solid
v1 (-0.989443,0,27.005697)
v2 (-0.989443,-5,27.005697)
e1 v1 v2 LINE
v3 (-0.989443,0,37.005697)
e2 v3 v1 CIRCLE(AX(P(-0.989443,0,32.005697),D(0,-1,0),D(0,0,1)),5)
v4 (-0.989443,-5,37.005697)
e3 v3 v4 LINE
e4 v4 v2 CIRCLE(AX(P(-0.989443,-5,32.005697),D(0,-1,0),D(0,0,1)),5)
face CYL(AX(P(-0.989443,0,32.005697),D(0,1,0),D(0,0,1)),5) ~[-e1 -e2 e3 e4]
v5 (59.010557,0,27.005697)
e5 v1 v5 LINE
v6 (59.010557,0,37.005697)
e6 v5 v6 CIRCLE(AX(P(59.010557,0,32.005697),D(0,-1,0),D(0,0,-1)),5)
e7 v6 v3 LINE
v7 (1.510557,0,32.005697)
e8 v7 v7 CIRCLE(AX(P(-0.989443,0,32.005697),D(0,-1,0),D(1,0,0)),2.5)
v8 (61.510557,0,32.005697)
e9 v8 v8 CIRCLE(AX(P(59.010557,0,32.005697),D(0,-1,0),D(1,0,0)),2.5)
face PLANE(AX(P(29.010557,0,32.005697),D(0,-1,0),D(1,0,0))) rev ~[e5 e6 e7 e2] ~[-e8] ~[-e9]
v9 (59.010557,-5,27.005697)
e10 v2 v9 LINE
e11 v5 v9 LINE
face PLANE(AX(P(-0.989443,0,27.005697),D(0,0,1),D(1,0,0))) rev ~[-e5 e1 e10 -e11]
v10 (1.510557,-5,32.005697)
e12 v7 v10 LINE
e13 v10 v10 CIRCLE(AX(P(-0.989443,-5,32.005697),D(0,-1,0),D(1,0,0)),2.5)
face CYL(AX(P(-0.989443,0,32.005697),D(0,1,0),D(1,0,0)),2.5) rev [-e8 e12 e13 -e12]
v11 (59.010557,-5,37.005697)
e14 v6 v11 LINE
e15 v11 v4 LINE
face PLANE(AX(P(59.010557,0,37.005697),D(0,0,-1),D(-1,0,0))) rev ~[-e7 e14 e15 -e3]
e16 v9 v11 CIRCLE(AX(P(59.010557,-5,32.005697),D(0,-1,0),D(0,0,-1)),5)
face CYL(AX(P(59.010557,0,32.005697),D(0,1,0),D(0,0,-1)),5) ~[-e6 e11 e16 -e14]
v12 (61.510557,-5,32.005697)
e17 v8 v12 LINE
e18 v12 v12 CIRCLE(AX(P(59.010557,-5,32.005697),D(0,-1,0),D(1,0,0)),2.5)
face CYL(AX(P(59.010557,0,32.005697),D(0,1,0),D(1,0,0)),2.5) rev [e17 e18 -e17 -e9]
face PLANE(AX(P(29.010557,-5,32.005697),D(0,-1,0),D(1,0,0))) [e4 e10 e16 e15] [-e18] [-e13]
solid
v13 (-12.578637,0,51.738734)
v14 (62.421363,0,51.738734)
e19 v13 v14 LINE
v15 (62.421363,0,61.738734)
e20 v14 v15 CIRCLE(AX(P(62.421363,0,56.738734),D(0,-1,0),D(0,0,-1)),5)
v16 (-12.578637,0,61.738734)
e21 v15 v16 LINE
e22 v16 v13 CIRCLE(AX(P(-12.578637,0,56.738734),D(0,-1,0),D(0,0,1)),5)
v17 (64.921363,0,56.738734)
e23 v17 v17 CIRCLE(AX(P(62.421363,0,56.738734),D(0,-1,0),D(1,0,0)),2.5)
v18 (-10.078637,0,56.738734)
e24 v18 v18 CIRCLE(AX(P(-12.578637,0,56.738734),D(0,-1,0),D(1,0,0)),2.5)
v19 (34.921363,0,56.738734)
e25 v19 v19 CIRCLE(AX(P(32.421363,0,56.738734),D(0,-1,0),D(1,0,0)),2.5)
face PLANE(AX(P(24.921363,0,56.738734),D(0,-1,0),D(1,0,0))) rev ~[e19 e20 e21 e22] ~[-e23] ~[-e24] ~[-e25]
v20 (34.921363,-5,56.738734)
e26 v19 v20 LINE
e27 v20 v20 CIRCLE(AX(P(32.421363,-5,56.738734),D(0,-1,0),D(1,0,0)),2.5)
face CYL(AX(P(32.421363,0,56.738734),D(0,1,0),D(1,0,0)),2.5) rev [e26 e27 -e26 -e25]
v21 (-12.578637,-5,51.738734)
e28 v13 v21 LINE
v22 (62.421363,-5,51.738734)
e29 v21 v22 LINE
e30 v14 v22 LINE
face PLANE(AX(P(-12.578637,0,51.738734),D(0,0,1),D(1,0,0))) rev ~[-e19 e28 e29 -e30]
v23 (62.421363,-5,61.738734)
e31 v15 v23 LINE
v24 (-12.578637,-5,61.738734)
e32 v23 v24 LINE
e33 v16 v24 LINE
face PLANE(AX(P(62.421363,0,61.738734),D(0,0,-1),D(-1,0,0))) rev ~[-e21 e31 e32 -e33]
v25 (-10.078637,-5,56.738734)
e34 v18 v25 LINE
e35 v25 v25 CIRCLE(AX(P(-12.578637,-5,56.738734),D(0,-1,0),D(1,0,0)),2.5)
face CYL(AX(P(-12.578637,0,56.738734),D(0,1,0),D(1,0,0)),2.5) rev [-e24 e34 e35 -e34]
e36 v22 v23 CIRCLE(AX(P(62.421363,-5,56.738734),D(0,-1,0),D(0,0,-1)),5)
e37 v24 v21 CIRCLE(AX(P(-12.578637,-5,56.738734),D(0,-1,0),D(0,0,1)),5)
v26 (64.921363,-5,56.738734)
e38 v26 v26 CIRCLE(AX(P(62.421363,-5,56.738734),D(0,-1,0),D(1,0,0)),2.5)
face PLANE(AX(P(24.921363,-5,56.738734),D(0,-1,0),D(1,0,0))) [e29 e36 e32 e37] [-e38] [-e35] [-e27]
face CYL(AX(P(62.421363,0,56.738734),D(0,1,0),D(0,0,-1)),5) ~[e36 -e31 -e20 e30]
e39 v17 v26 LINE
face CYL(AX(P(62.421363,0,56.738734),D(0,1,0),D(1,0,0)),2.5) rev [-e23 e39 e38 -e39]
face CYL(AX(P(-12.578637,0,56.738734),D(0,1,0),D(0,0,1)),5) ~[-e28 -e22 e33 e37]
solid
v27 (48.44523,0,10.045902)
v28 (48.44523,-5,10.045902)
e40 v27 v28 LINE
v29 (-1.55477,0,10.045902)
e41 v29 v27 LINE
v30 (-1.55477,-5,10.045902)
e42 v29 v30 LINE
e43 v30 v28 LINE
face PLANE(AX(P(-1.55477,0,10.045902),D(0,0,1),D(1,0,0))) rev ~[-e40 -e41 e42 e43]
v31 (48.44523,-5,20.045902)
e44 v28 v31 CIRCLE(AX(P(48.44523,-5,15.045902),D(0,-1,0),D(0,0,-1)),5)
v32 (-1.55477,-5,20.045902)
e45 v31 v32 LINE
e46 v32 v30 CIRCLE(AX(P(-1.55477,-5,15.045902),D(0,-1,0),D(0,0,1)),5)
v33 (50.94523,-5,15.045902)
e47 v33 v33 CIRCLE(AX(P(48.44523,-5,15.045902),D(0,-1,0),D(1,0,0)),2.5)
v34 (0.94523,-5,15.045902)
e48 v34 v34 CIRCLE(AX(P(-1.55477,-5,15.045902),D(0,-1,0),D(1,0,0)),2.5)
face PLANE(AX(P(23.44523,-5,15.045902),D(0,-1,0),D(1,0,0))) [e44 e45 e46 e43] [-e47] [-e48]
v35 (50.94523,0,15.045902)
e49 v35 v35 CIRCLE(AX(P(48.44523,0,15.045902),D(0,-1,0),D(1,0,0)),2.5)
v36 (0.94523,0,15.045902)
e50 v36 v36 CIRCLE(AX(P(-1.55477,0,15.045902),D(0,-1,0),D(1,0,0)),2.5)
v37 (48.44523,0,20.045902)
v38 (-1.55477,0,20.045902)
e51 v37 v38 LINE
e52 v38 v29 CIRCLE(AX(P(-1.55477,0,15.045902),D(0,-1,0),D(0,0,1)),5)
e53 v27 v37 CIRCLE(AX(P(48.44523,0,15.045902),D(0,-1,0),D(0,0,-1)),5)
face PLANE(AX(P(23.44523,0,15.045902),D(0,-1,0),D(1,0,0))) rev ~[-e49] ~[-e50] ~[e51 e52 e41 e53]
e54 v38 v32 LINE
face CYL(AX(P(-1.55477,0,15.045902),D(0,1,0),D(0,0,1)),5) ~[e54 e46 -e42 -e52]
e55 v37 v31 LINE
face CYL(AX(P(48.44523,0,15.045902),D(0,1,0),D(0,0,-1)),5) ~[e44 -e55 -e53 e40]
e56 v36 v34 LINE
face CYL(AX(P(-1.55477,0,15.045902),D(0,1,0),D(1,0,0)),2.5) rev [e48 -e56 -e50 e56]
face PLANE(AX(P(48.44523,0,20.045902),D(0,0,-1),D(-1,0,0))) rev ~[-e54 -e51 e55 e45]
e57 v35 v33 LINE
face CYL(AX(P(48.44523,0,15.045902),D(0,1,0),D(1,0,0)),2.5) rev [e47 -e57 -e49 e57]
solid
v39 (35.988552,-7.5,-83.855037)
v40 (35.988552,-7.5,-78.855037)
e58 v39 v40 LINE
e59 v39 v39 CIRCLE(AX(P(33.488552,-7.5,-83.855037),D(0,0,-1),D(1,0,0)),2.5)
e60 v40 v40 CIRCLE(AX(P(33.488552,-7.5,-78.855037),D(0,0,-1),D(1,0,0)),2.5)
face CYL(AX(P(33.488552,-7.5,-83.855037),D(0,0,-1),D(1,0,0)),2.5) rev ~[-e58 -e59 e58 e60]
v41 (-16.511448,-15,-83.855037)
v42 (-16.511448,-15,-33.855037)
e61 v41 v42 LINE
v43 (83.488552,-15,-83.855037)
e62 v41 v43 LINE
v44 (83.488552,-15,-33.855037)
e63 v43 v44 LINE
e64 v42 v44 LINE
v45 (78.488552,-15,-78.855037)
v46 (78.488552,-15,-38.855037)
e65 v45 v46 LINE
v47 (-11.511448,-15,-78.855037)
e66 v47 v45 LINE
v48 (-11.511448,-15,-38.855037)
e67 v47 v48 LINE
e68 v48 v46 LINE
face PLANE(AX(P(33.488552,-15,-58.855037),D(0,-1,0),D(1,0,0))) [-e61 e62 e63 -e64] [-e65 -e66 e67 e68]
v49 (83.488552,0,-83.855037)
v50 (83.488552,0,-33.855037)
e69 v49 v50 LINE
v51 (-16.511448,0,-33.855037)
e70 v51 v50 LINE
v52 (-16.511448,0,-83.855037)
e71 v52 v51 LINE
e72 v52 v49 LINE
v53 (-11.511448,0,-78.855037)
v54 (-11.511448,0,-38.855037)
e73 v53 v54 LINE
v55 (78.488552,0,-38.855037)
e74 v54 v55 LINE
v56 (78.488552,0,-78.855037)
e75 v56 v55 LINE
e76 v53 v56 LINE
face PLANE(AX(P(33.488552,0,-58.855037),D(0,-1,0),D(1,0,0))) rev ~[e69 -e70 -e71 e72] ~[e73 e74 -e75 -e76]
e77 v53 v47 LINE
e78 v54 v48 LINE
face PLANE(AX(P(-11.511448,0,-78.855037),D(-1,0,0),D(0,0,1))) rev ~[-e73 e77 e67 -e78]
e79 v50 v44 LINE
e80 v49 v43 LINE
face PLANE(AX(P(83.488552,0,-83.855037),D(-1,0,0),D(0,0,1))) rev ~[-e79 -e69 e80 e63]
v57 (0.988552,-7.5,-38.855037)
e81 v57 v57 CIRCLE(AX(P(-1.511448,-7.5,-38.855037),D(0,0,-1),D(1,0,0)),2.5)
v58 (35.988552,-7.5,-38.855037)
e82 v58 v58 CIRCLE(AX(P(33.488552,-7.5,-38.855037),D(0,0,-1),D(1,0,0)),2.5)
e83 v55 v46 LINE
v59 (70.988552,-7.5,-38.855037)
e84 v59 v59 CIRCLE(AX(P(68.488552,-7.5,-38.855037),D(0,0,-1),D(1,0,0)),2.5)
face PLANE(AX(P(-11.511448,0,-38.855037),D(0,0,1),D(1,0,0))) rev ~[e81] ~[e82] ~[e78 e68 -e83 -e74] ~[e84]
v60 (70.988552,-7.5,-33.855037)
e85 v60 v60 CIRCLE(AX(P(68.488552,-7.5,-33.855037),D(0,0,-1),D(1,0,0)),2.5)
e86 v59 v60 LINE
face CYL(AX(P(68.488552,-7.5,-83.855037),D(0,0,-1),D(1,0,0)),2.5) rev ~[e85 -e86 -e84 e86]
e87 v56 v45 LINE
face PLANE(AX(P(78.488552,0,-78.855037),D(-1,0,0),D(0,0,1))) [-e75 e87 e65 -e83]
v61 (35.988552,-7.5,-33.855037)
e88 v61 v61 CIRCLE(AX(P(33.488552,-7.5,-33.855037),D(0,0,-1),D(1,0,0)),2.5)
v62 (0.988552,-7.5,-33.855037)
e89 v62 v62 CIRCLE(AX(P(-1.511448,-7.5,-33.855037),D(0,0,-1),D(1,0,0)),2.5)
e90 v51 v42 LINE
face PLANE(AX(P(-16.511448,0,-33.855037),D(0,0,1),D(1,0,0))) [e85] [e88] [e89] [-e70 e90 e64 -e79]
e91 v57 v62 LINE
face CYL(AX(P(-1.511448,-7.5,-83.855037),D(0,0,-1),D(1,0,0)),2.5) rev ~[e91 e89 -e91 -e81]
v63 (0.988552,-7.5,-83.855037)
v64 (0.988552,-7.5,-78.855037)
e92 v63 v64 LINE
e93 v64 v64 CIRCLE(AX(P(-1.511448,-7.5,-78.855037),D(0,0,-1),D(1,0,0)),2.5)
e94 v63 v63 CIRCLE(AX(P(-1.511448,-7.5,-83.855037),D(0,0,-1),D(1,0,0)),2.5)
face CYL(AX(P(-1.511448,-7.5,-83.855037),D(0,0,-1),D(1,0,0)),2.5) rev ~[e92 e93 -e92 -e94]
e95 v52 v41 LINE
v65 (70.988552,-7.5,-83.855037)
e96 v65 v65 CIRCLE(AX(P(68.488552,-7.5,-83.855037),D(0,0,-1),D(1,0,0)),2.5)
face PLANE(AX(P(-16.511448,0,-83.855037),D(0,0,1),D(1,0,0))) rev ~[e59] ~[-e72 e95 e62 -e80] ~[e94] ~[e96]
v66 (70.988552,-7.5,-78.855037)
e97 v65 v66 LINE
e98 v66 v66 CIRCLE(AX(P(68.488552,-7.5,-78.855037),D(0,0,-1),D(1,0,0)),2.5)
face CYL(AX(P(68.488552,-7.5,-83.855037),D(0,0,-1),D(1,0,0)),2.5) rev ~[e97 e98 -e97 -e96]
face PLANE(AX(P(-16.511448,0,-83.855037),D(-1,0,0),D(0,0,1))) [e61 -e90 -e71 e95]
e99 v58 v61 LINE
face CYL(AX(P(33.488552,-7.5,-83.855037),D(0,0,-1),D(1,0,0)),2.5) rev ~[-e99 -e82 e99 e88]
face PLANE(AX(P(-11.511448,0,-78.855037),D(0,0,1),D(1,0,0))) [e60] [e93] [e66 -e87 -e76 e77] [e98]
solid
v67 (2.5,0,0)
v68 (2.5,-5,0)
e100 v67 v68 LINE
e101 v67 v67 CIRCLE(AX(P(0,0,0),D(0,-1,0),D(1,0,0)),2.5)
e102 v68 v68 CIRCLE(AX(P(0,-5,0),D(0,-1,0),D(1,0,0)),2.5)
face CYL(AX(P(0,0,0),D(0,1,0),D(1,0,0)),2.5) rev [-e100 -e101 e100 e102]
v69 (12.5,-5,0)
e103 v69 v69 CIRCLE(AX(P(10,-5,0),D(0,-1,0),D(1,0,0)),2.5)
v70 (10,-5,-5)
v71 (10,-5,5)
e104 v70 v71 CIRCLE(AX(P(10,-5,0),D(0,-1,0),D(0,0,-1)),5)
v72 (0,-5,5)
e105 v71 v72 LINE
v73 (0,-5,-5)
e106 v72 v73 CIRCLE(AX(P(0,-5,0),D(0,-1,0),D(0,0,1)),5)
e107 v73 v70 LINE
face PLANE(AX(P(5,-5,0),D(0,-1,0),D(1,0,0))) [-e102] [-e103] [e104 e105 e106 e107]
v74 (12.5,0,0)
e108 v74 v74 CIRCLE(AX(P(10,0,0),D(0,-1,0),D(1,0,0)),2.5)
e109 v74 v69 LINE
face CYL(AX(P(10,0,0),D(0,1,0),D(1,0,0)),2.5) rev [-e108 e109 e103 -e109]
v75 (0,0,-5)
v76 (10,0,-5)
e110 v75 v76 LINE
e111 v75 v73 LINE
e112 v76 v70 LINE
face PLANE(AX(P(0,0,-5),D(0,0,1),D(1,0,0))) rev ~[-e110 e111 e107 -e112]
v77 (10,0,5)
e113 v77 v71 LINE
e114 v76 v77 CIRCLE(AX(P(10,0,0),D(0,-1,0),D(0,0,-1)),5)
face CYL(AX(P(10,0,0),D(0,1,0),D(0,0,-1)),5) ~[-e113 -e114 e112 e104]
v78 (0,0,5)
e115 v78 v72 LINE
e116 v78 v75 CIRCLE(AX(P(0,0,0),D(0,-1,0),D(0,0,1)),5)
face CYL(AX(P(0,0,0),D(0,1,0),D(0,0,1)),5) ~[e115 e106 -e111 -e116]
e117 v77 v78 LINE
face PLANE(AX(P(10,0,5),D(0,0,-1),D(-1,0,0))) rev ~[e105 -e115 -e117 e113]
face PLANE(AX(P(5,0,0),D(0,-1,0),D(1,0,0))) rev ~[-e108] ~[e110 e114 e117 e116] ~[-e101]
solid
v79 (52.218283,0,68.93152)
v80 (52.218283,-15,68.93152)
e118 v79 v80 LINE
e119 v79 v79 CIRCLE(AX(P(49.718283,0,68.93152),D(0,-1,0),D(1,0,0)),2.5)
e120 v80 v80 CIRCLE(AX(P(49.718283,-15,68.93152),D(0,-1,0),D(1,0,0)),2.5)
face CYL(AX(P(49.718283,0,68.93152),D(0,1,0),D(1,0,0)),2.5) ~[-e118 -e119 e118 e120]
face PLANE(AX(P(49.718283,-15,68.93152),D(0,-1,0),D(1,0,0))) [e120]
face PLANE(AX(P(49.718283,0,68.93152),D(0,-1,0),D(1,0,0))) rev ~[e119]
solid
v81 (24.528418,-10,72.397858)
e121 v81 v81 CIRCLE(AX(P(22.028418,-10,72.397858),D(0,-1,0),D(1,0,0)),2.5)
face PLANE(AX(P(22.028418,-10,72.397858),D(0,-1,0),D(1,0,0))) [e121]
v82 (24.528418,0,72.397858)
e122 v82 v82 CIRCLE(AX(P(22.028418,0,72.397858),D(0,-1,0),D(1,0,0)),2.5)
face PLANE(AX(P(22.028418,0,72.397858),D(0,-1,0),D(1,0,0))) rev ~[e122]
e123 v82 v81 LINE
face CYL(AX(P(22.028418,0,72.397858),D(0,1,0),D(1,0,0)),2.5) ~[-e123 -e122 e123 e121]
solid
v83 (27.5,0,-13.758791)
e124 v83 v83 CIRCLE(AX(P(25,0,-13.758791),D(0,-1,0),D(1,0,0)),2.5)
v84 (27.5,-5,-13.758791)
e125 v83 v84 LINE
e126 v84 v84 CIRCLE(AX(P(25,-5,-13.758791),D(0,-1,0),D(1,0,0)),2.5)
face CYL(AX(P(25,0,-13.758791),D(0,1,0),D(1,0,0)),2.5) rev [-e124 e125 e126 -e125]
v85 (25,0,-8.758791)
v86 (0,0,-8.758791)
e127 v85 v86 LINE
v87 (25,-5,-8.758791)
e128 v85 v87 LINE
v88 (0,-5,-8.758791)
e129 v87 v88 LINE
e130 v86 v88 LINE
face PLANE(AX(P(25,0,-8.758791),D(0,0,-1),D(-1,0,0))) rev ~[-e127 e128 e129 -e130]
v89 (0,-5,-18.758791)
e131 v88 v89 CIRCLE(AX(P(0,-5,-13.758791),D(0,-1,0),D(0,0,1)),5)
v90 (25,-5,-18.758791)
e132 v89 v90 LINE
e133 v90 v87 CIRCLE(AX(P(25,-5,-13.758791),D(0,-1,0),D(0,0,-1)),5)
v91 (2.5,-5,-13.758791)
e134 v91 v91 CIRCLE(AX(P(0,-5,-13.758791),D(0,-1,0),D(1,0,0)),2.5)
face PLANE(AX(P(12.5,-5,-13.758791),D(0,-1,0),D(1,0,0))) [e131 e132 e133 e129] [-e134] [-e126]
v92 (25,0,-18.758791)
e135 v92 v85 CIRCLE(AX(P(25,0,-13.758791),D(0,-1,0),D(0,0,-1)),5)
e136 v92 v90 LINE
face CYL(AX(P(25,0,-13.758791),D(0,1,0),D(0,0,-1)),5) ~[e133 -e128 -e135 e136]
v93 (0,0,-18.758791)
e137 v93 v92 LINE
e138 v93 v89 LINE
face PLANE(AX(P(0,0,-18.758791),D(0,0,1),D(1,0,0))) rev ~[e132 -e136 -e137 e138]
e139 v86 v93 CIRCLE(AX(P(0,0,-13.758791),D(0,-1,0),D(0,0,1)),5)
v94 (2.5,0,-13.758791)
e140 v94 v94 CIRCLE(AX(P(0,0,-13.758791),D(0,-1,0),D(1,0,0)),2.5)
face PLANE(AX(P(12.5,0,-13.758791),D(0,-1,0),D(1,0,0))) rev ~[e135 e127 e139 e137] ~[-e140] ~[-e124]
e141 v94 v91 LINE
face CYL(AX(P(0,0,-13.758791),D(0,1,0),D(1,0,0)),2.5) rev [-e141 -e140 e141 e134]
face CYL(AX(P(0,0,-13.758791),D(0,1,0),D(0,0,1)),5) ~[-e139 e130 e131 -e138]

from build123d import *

# Parameters (mm, degrees)
F1_R      = 2.5
F2_DEPTH  = 5
F3_R      = 2.5
F4_DEPTH  = 5
F5_R      = 2.5
F6_DEPTH  = 5
F7_R      = 2.5
F8_DEPTH  = 5
F9_R      = 2.5
F10_DEPTH = 5
F11_W     = 100
F11_H     = 50
F11_W_2   = 90
F11_H_2   = 40
F12_DEPTH = 15
F13_R     = 2.5
F14_DEPTH = 50
F15_R     = 2.5
F16_DEPTH = 10
F17_R     = 2.5
F18_DEPTH = 15


with BuildPart() as f2:
    # F1 (on Front) → F2 (new body)
    with BuildSketch(Plane.XZ):
        with BuildLine():
            Line((10, 5), (0, 5))
            ThreePointArc((0, 5), (-5, 0), (0, -5))
            Line((0, -5), (10, -5))
            ThreePointArc((10, -5), (15, 0), (10, 5))
        make_face()
        Circle(F1_R, mode=Mode.SUBTRACT)
        with Locations((10, 0)):
            Circle(F1_R, mode=Mode.SUBTRACT)
    extrude(amount=F2_DEPTH)


with BuildPart() as f4:
    # F3 (on Front) → F4 (new body)
    with BuildSketch(Plane.XZ):
        with BuildLine():
            Line((25, -8.7587906366), (0, -8.7587906366))
            ThreePointArc((0, -8.7587906366), (-5, -13.7587906366), (0, -18.7587906366))
            Line((0, -18.7587906366), (25, -18.7587906366))
            ThreePointArc((25, -18.7587906366), (30, -13.7587906366), (25, -8.7587906366))
        make_face()
        with Locations((0, -13.7587906366)):
            Circle(F3_R, mode=Mode.SUBTRACT)
        with Locations((25, -13.7587906366)):
            Circle(F3_R, mode=Mode.SUBTRACT)
    extrude(amount=F4_DEPTH)


with BuildPart() as f6:
    # F5 (on Front) → F6 (new body)
    with BuildSketch(Plane.XZ):
        with BuildLine():
            Line((48.4452299587, 20.0459017605), (-1.5547700413, 20.0459017605))
            ThreePointArc((-1.5547700413, 20.0459017605), (-6.5547700413, 15.0459017605), (-1.5547700413, 10.0459017605))
            Line((-1.5547700413, 10.0459017605), (48.4452299587, 10.0459017605))
            ThreePointArc((48.4452299587, 10.0459017605), (53.4452299587, 15.0459017605), (48.4452299587, 20.0459017605))
        make_face()
        with Locations((-1.5547700413, 15.0459017605)):
            Circle(F5_R, mode=Mode.SUBTRACT)
        with Locations((48.4452299587, 15.0459017605)):
            Circle(F5_R, mode=Mode.SUBTRACT)
    extrude(amount=F6_DEPTH)


with BuildPart() as f8:
    # F7 (on Front) → F8 (new body)
    with BuildSketch(Plane.XZ):
        with BuildLine():
            Line((59.0105567314, 37.0056974888), (-0.9894432686, 37.0056974888))
            ThreePointArc((-0.9894432686, 37.0056974888), (-5.9894432686, 32.0056974888), (-0.9894432686, 27.0056974888))
            Line((-0.9894432686, 27.0056974888), (59.0105567314, 27.0056974888))
            ThreePointArc((59.0105567314, 27.0056974888), (64.0105567314, 32.0056974888), (59.0105567314, 37.0056974888))
        make_face()
        with Locations((-0.9894432686, 32.0056974888)):
            Circle(F7_R, mode=Mode.SUBTRACT)
        with Locations((59.0105567314, 32.0056974888)):
            Circle(F7_R, mode=Mode.SUBTRACT)
    extrude(amount=F8_DEPTH)


with BuildPart() as f10:
    # F9 (on Front) → F10 (new body)
    with BuildSketch(Plane.XZ):
        with BuildLine():
            Line((62.4213630147, 61.7387342453), (-12.5786369853, 61.7387342453))
            ThreePointArc((-12.5786369853, 61.7387342453), (-17.5786369853, 56.7387342453), (-12.5786369853, 51.7387342453))
            Line((-12.5786369853, 51.7387342453), (62.4213630147, 51.7387342453))
            ThreePointArc((62.4213630147, 51.7387342453), (67.4213630147, 56.7387342453), (62.4213630147, 61.7387342453))
        make_face()
        with Locations((-12.5786369853, 56.7387342453)):
            Circle(F9_R, mode=Mode.SUBTRACT)
        with Locations((32.4213630147, 56.7387342453)):
            Circle(F9_R, mode=Mode.SUBTRACT)
        with Locations((62.4213630147, 56.7387342453)):
            Circle(F9_R, mode=Mode.SUBTRACT)
    extrude(amount=F10_DEPTH)


with BuildPart() as f12:
    # F11 (on Front) → F12 (new body)
    with BuildSketch(Plane.XZ):
        with Locations((33.4885520861, -58.8550369338)):
            Rectangle(F11_W, F11_H)
        with Locations((33.4885520861, -58.8550369338)):
            Rectangle(F11_W_2, F11_H_2, mode=Mode.SUBTRACT)
    extrude(amount=F12_DEPTH)

    # F13 (on face) → F14 (cut)
    with BuildSketch(Plane(origin=(0, 0, -83.8550369338), x_dir=(1, 0, 0), z_dir=(0, 0, -1))):
        with Locations((-1.5114479139, 7.5)):
            Circle(F13_R)
        with Locations((33.4885520861, 7.5)):
            Circle(F13_R)
        with Locations((68.4885520861, 7.5)):
            Circle(F13_R)
    extrude(amount=-F14_DEPTH, mode=Mode.SUBTRACT)


with BuildPart() as f16:
    # F15 (on Front) → F16 (new body)
    with BuildSketch(Plane.XZ):
        with Locations((22.0284182578, 72.3978579044)):
            Circle(F15_R)
    extrude(amount=F16_DEPTH)


with BuildPart() as f18:
    # F17 (on Front) → F18 (new body)
    with BuildSketch(Plane.XZ):
        with Locations((49.7182831168, 68.9315199852)):
            Circle(F17_R)
    extrude(amount=F18_DEPTH)


solid = Compound([f2.part, f4.part, f6.part, f8.part, f10.part, f12.part, f16.part, f18.part])
